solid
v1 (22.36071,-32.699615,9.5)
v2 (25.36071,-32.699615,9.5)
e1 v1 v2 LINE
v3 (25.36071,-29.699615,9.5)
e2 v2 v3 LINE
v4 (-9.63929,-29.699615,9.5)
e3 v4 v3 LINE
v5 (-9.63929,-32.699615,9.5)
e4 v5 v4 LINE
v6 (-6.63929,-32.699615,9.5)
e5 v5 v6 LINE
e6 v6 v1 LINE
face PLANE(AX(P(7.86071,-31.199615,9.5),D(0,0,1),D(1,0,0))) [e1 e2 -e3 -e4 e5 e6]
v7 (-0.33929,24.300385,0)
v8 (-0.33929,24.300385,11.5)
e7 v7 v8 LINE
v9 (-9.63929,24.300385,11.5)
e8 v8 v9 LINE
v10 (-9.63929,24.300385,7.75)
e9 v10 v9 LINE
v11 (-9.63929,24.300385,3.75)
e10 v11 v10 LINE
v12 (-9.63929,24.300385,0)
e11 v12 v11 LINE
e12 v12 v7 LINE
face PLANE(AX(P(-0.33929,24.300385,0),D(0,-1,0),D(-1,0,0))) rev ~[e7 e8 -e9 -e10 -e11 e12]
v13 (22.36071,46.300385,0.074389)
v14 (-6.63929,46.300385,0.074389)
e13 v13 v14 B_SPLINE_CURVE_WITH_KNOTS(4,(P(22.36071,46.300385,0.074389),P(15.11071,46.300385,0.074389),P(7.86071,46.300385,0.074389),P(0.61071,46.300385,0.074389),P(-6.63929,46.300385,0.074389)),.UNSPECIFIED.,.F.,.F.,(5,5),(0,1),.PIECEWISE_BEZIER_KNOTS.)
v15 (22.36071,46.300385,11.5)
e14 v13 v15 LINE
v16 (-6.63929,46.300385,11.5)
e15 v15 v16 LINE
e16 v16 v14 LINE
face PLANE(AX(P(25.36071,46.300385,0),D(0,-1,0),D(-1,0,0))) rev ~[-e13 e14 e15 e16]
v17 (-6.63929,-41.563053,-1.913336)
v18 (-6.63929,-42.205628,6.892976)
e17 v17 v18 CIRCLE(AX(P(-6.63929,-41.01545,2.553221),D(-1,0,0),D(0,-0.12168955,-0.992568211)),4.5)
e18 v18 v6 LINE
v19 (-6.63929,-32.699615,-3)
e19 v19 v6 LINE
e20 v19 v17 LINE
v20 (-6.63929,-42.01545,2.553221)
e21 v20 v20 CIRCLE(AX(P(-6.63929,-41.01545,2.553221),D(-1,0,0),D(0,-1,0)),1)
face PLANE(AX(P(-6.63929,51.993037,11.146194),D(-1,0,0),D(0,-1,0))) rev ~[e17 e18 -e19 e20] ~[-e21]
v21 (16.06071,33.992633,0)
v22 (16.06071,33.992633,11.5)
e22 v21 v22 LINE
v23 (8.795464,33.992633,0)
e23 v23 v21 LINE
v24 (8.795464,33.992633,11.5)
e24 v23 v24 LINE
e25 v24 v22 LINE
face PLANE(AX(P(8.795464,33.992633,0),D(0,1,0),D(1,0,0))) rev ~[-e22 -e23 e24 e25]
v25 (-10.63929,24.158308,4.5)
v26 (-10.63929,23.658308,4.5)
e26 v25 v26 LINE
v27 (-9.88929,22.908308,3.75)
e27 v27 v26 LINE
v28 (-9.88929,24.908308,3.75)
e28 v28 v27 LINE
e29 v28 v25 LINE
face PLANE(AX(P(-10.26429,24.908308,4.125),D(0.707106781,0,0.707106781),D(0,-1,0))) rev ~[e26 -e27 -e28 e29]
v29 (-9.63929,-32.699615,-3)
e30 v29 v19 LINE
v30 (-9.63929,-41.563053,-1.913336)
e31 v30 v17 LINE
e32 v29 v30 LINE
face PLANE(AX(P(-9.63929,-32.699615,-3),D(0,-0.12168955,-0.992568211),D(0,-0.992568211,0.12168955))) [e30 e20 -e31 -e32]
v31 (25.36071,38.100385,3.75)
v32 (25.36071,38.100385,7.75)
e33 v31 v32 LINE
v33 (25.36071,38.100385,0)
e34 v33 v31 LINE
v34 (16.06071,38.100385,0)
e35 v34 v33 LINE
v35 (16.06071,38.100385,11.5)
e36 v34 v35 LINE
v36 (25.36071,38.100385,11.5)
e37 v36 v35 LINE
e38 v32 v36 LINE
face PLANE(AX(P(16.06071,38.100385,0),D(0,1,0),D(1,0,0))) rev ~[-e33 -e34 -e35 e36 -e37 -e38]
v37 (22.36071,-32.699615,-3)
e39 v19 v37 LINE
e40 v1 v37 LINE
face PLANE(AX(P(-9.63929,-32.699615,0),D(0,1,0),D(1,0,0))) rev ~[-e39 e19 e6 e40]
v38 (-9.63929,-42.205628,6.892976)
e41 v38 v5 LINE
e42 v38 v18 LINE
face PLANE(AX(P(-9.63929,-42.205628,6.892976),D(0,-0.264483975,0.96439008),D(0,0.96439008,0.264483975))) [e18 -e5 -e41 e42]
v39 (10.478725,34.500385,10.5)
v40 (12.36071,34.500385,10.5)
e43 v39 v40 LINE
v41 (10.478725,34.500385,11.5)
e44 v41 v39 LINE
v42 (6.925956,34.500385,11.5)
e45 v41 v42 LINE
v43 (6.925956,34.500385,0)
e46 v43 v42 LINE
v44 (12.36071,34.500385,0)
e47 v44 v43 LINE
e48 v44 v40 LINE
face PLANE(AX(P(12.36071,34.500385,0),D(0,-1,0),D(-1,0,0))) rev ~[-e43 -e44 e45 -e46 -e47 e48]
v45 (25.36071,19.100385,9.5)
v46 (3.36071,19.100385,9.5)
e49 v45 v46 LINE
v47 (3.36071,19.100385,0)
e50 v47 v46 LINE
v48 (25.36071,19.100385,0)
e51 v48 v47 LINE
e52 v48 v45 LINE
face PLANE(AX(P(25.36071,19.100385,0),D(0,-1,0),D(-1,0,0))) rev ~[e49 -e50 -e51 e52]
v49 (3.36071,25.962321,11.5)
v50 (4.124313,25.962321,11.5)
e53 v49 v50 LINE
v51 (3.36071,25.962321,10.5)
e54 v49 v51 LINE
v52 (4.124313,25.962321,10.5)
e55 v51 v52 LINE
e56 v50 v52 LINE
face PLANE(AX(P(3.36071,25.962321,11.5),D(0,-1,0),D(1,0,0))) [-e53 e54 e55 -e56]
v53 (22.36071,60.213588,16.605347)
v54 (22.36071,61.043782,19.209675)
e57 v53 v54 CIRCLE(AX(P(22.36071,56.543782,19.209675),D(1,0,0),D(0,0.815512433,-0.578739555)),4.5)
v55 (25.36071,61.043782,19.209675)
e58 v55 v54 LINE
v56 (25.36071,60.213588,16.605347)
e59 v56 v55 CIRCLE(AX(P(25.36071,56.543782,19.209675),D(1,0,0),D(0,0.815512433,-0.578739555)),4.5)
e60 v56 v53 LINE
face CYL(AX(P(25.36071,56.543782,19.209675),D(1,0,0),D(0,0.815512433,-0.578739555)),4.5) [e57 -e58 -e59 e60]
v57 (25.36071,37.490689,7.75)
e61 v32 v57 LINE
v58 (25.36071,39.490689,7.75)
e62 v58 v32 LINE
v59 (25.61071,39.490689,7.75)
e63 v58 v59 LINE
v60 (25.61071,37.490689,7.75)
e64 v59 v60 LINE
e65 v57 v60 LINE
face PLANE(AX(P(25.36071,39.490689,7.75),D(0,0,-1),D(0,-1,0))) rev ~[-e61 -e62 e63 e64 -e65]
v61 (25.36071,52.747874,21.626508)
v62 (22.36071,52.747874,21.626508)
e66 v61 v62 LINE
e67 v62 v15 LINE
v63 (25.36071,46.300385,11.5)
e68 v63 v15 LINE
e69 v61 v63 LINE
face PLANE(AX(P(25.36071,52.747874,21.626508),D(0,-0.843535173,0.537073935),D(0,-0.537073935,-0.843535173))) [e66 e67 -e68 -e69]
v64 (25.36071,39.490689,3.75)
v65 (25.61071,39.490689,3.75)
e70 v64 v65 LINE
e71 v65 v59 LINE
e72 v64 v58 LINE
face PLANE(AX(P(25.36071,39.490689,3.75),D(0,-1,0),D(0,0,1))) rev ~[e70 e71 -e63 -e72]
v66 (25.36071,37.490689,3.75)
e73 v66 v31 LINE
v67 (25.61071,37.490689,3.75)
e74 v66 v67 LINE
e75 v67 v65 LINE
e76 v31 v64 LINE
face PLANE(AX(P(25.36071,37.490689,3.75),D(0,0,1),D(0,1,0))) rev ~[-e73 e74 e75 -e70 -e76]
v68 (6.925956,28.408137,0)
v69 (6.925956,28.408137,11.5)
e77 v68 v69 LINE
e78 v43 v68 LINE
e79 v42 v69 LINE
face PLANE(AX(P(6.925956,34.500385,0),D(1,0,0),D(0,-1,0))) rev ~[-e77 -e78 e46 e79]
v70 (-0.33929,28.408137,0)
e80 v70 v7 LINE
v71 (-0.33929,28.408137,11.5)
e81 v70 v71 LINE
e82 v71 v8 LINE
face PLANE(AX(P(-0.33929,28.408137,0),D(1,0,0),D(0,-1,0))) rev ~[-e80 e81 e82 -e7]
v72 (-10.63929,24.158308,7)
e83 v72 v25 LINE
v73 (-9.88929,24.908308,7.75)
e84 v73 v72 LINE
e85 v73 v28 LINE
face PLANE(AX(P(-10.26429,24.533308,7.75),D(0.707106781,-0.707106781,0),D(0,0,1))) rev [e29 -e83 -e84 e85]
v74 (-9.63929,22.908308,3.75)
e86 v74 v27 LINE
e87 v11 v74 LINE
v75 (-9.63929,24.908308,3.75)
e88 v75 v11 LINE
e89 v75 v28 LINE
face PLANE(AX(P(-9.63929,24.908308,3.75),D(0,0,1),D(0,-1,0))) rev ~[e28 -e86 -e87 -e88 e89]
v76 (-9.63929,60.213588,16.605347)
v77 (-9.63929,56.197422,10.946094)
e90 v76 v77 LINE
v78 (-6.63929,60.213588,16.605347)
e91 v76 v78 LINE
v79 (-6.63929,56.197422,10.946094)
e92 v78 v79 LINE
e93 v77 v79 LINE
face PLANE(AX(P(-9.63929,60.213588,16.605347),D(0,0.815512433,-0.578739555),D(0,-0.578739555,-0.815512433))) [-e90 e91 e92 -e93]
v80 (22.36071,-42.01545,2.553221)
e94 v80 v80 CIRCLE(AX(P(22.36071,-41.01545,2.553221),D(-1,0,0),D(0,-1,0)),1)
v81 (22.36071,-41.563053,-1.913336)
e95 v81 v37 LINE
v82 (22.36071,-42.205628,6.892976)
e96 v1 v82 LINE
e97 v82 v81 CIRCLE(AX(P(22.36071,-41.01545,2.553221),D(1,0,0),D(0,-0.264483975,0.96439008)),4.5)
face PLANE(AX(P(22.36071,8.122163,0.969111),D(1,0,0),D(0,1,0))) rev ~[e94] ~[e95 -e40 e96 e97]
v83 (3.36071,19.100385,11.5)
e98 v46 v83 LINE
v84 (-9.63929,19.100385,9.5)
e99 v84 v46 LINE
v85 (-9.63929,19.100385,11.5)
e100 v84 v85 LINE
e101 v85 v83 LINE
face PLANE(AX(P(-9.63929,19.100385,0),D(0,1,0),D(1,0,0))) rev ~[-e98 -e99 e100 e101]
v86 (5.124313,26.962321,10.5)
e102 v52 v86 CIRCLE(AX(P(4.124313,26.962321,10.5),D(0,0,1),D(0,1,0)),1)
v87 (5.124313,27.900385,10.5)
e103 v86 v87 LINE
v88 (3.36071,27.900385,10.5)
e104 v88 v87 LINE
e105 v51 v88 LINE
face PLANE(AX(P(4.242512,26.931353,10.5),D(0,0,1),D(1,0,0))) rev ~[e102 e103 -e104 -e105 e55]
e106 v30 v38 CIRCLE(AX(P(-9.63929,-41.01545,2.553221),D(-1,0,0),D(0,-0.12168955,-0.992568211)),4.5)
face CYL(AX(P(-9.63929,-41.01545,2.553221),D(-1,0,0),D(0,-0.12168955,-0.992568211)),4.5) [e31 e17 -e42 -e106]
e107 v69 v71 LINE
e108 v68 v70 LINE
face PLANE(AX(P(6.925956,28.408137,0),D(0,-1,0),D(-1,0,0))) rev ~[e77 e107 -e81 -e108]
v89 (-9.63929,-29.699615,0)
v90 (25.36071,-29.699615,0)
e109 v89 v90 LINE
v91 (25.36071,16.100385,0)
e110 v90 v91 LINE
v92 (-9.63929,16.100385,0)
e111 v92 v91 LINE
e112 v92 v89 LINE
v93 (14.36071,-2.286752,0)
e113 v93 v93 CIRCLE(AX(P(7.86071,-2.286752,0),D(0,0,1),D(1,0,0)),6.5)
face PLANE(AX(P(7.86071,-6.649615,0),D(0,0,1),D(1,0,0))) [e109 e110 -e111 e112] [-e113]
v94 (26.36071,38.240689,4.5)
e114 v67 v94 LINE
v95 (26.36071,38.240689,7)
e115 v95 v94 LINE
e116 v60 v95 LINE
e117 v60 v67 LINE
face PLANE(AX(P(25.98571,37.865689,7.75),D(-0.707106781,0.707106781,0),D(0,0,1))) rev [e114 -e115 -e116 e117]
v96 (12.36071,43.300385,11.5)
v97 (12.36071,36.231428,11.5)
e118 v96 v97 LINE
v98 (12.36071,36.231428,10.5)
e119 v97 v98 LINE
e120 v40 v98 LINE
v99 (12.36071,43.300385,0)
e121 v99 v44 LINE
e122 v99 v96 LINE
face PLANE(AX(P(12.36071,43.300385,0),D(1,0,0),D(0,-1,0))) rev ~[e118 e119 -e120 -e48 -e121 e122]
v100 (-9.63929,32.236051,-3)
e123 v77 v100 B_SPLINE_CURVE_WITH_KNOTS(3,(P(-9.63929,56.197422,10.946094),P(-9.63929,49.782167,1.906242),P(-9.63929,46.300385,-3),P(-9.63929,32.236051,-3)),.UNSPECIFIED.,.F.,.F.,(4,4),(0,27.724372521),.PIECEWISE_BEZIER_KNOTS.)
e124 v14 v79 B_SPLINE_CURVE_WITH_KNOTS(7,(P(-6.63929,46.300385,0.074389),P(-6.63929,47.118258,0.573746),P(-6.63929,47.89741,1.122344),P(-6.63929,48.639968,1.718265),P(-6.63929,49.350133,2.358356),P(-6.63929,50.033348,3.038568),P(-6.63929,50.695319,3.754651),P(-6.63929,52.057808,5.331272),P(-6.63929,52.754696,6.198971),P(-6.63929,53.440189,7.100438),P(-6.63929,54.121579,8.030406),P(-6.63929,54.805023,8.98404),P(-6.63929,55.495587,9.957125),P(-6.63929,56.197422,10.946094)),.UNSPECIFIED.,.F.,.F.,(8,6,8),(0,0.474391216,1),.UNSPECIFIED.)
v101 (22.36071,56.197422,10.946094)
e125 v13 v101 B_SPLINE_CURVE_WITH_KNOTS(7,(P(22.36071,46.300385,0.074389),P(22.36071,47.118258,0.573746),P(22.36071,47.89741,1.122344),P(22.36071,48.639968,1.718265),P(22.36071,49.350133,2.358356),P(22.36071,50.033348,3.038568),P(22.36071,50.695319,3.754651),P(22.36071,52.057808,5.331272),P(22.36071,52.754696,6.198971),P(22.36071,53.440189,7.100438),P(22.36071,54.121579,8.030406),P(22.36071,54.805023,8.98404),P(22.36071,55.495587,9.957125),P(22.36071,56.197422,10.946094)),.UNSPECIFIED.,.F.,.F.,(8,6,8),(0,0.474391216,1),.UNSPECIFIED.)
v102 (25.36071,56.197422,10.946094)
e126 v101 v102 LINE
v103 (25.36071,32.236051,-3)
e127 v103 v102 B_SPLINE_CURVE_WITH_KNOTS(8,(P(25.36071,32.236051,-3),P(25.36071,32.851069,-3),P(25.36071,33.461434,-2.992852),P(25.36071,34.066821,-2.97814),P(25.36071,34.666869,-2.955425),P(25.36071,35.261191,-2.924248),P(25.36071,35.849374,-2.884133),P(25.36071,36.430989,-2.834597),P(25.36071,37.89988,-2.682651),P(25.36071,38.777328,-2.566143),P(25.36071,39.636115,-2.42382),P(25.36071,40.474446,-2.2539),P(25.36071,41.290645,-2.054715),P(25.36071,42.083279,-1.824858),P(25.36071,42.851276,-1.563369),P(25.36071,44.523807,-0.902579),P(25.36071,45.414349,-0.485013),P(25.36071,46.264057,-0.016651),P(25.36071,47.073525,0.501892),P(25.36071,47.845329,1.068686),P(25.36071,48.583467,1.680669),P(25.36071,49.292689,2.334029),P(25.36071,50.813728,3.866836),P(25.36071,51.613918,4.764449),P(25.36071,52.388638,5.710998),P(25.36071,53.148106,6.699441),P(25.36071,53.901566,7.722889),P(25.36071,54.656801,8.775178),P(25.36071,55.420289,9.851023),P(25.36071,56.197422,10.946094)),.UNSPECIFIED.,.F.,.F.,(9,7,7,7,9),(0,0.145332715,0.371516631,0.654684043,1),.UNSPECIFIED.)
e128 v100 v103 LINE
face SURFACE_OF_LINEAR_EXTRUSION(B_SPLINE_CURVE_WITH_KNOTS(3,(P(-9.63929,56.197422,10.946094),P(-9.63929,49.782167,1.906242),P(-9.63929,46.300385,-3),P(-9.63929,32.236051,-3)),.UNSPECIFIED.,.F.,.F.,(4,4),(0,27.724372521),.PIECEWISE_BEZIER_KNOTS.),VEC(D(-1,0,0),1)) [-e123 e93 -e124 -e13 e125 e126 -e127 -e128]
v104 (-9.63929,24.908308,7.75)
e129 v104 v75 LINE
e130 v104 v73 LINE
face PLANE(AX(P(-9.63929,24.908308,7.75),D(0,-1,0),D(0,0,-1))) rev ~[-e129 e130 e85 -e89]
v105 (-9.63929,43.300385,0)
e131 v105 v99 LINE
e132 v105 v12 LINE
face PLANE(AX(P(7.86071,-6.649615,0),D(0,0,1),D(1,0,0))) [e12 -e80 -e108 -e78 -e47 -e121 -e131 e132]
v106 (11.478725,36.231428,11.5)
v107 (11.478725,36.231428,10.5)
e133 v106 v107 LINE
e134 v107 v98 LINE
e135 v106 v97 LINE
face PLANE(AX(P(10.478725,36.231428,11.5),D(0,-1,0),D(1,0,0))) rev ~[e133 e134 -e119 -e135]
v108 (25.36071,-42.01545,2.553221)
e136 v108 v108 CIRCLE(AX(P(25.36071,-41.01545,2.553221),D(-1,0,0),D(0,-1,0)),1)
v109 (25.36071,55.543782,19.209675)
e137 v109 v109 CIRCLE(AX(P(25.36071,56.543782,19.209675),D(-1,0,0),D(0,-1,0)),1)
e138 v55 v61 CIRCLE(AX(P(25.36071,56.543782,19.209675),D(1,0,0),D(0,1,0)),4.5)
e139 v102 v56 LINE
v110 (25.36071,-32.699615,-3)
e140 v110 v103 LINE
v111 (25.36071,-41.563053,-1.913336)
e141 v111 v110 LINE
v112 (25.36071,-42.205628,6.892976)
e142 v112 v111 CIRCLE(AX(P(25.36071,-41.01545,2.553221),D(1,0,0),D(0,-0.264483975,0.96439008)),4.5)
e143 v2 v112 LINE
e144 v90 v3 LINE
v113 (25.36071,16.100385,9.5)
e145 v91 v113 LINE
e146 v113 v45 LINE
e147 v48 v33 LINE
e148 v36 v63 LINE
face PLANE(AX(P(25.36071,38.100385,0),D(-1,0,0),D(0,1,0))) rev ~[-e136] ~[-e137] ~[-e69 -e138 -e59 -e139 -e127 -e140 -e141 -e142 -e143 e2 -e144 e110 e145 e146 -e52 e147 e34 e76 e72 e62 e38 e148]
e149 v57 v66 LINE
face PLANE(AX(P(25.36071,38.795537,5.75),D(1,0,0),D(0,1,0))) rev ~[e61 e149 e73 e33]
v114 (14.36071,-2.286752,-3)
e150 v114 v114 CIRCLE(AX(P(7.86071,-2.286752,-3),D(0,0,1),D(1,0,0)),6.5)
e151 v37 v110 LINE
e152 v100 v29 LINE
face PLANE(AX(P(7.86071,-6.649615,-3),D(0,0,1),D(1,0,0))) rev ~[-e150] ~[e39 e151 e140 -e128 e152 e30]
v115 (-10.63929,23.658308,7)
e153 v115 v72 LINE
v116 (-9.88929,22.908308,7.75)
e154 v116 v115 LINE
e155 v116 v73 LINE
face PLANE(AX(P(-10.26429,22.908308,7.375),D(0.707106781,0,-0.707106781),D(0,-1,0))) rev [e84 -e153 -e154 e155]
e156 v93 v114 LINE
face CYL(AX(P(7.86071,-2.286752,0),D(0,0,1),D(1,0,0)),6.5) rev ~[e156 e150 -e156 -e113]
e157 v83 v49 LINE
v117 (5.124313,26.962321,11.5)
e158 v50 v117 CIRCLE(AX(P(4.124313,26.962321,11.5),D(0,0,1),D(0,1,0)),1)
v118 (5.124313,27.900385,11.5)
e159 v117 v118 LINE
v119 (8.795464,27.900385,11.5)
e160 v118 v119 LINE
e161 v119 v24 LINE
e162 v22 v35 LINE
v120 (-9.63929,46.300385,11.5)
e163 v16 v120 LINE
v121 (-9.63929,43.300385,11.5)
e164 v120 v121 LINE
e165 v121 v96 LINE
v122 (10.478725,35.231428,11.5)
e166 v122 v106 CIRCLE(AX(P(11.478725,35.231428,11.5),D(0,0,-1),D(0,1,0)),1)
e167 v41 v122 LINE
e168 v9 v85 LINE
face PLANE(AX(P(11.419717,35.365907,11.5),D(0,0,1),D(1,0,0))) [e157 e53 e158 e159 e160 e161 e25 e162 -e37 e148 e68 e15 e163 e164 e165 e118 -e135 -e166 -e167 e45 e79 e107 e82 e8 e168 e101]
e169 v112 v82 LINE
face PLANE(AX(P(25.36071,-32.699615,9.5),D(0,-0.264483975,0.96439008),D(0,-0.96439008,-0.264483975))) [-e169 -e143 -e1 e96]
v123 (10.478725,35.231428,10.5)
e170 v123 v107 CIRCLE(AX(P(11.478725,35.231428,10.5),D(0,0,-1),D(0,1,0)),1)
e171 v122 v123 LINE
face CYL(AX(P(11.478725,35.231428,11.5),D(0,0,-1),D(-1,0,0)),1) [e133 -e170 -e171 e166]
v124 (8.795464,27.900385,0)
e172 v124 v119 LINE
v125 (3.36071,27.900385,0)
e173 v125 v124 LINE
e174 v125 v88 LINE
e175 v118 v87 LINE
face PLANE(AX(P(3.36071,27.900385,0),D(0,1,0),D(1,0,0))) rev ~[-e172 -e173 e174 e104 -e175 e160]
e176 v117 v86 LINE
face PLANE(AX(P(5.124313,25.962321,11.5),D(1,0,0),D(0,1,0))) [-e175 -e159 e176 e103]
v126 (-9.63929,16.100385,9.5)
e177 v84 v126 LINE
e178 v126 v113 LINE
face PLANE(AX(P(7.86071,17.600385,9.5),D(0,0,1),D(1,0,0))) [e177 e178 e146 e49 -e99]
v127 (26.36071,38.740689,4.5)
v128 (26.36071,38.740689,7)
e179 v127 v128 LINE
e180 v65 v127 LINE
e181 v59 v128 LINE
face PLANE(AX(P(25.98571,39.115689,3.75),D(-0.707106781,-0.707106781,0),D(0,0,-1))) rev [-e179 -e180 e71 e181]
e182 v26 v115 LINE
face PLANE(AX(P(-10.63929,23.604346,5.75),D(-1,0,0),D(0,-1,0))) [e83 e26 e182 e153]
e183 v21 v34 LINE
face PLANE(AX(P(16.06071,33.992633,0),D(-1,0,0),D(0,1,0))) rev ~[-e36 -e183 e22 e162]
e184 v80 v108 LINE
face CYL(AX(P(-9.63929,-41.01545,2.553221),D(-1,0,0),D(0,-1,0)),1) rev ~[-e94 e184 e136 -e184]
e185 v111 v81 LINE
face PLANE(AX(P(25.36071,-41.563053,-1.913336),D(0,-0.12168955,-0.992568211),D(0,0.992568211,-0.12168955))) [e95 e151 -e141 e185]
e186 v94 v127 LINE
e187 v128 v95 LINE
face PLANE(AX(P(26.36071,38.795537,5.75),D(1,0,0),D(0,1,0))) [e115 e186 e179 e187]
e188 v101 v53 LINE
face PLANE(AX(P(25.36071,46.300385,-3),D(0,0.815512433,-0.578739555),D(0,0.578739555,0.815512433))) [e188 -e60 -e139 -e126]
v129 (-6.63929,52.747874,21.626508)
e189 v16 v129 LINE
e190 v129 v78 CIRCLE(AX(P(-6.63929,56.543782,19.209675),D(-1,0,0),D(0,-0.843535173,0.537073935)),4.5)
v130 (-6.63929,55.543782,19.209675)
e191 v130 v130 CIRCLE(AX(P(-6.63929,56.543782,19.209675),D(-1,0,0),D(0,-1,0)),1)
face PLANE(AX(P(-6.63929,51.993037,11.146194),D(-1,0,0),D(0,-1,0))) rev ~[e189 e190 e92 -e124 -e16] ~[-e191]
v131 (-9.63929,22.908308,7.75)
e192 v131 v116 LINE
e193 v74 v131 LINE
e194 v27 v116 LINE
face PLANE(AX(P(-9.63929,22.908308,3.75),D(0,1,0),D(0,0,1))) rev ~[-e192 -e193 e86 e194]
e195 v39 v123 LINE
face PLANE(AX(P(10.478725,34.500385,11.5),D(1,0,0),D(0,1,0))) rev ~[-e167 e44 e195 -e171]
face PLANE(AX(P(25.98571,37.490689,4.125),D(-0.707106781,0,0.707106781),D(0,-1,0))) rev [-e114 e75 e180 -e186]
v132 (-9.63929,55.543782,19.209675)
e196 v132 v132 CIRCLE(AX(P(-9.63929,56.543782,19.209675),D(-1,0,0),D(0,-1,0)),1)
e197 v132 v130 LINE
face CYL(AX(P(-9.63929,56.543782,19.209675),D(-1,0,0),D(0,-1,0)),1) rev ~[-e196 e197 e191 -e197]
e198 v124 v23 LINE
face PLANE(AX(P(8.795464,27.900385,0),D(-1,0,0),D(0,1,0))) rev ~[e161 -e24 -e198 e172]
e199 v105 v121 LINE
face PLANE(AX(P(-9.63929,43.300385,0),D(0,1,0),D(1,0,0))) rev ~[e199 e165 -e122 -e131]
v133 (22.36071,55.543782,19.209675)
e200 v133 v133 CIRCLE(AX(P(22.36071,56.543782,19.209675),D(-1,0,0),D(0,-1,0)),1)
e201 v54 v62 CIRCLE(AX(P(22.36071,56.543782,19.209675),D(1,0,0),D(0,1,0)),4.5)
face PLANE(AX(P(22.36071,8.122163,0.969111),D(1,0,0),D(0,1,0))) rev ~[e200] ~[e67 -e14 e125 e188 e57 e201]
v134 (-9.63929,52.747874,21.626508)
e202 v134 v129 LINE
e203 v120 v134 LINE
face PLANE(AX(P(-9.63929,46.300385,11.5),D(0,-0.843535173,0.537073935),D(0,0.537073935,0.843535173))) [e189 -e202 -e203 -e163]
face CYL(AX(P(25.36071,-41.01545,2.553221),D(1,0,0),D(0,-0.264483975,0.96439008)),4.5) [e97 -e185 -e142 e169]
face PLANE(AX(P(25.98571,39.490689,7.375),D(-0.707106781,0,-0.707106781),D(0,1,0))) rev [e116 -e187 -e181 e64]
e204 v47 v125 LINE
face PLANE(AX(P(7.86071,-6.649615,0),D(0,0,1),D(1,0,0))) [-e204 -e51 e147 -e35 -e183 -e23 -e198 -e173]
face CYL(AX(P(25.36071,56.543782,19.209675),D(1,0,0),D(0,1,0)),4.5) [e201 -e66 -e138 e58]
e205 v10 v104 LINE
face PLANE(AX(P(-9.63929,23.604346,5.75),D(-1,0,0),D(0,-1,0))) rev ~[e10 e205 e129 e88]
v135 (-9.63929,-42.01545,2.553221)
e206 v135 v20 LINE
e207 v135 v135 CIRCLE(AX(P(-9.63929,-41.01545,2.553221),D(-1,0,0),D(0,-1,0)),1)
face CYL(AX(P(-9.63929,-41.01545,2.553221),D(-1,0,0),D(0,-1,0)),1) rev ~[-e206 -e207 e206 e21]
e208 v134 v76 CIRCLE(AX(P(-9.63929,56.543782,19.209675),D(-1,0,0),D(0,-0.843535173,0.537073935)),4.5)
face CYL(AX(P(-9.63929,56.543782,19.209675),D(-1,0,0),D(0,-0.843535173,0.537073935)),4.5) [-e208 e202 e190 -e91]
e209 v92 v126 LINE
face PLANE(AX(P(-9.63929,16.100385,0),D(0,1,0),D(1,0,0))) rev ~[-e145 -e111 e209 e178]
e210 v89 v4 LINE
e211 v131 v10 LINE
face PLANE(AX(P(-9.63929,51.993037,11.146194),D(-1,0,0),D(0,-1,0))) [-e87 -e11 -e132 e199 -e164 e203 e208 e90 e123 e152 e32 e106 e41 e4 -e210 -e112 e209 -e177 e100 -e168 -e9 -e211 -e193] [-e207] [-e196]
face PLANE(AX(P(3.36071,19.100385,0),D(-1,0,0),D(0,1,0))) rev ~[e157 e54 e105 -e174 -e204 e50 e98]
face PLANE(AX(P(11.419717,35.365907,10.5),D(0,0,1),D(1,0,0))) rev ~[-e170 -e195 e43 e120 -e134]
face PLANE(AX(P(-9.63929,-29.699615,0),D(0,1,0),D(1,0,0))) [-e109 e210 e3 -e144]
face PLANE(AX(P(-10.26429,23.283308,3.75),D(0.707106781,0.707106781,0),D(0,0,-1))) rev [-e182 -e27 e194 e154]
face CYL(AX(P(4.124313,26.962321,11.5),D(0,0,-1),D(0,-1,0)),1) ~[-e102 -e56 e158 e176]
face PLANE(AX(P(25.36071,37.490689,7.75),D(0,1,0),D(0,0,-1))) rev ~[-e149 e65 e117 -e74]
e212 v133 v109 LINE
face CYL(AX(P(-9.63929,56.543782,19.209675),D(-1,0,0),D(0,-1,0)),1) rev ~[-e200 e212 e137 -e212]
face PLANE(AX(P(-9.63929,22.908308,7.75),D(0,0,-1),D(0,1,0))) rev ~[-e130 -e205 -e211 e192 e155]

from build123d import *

# Parameters (mm, degrees)
F0_R      = 6.5
F0_W      = 34.999999702
F0_H      = 3
F0_H_2    = 0.3
F1_DEPTH  = 3
F2_DEPTH  = 9.5
F3_DEPTH  = 11.5
F5_DEPTH  = 3
F7_DEPTH  = 3
F8_R      = 1
F9_DEPTH  = 35.000999702
F11_DEPTH = 1
F13_DEPTH = 1
F14_SIZE  = 0.75
F15_W     = 1.8819853365
F15_H     = 1.731043148
F15_W_2   = 1.7636035271
F15_H_2   = 1.938064149
F16_DEPTH = 1
F18_DEPTH = 36.000999702
F19_R     = 1


# Not quite as in the source:
# - ends of sketch curves that miss each other by under 0.0002 mm in the source are joined
# - a feature names something its author has since deleted; it is built from what else it names


with BuildPart() as f1:
    # F0 (on Top) → F1 (new body)
    with BuildSketch(Plane.XY):
        Polygon((7.8607099131, 16.1003852367), (-9.6392899379, 16.1003852367), (-9.6392899379, -29.3996147633), (25.3607097641, -29.3996147633), (25.3607097641, 16.1003852367), align=None)
        with Locations((7.8607099131, -2.2867515218)):
            Circle(F0_R, mode=Mode.SUBTRACT)
        with Locations((7.8607099131, -31.1996147633)):
            Rectangle(F0_W, F0_H)
        Polygon((-9.6392899379, 19.1003852367), (-9.6392899379, 16.1003852367), (7.8607099131, 16.1003852367), (25.3607097641, 16.1003852367), (25.3607097641, 19.1003852367), (22.192974557, 19.1003852367), (3.3607097641, 19.1003852367), align=None)
        Polygon((-9.6392899379, 46.3003852367), (-9.6392899379, 43.3003852367), (-6.4715547308, 43.3003852367), (12.3607100621, 43.3003852367), (25.3607097641, 43.3003852367), (25.3607097641, 46.3003852367), align=None)
        with Locations((7.8607099131, -29.5496147633)):
            Rectangle(F0_W, F0_H_2)
        Polygon((16.0607097641, 38.1003852367), (25.3607097641, 38.1003852367), (25.3607097641, 43.3003852367), (12.3607100621, 43.3003852367), (12.3607100621, 35.3003852367), (12.3607100621, 34.5003852367), (7.8607097641, 34.5003852367), (7.8607100621, 33.9926332235), (8.7954637781, 33.9926332235), (16.0607097641, 33.9926332235), align=None)
        Polygon((-9.6392899379, 24.3003852367), (-9.6392899379, 19.1003852367), (3.3607097641, 19.1003852367), (3.3607097641, 27.1003852367), (3.3607097641, 27.9003852367), (7.8607100621, 27.9003852367), (7.8607100621, 28.4081372499), (6.9259563461, 28.4081372499), (-0.3392899379, 28.4081372499), (-0.3392899379, 24.3003852367), align=None)
        Polygon((6.9259563461, 34.5003852367), (6.9259563461, 28.4081372499), (7.8607097641, 28.4081372499), (7.8607100621, 33.9926332235), (7.8607100621, 34.5003852367), align=None)
        Polygon((7.8607100621, 28.4081372499), (7.8607100621, 27.9003852367), (8.7954637781, 27.9003852367), (8.7954637781, 33.9926332235), (7.8607097641, 33.9926332235), align=None)
        Polygon((-9.6392899379, 43.3003852367), (-9.6392899379, 24.3003852367), (-0.3392899379, 24.3003852367), (-0.3392899379, 28.4081372499), (6.9259563461, 28.4081372499), (6.9259563461, 34.5003852367), (7.8607100621, 34.5003852367), (12.3607100621, 34.5003852367), (12.3607100621, 35.3003852367), (12.3607100621, 43.3003852367), (-6.4715547308, 43.3003852367), align=None)
        Polygon((3.3607097641, 27.1003852367), (3.3607097641, 19.1003852367), (22.192974557, 19.1003852367), (25.3607097641, 19.1003852367), (25.3607097641, 38.1003852367), (16.0607097641, 38.1003852367), (16.0607097641, 33.9926332235), (8.7954637781, 33.9926332235), (8.7954637781, 27.9003852367), (7.8607100621, 27.9003852367), (3.3607097641, 27.9003852367), align=None)
    extrude(amount=-F1_DEPTH)

    # F0 (on Top) → F2 (join)
    with BuildSketch(Plane.XY):
        with Locations((7.8607099131, -31.1996147633)):
            Rectangle(F0_W, F0_H)
        Polygon((-9.6392899379, 19.1003852367), (-9.6392899379, 16.1003852367), (7.8607099131, 16.1003852367), (25.3607097641, 16.1003852367), (25.3607097641, 19.1003852367), (22.192974557, 19.1003852367), (3.3607097641, 19.1003852367), align=None)
    extrude(amount=F2_DEPTH)

    # F0 (on Top) → F3 (join)
    with BuildSketch(Plane.XY):
        Polygon((-9.6392899379, 46.3003852367), (-9.6392899379, 43.3003852367), (-6.4715547308, 43.3003852367), (12.3607100621, 43.3003852367), (25.3607097641, 43.3003852367), (25.3607097641, 46.3003852367), align=None)
        Polygon((-9.6392899379, 24.3003852367), (-9.6392899379, 19.1003852367), (3.3607097641, 19.1003852367), (3.3607097641, 27.1003852367), (3.3607097641, 27.9003852367), (7.8607100621, 27.9003852367), (7.8607100621, 28.4081372499), (6.9259563461, 28.4081372499), (-0.3392899379, 28.4081372499), (-0.3392899379, 24.3003852367), align=None)
        Polygon((7.8607100621, 28.4081372499), (7.8607100621, 27.9003852367), (8.7954637781, 27.9003852367), (8.7954637781, 33.9926332235), (7.8607097641, 33.9926332235), align=None)
        Polygon((6.9259563461, 34.5003852367), (6.9259563461, 28.4081372499), (7.8607097641, 28.4081372499), (7.8607100621, 33.9926332235), (7.8607100621, 34.5003852367), align=None)
        Polygon((16.0607097641, 38.1003852367), (25.3607097641, 38.1003852367), (25.3607097641, 43.3003852367), (12.3607100621, 43.3003852367), (12.3607100621, 35.3003852367), (12.3607100621, 34.5003852367), (7.8607097641, 34.5003852367), (7.8607100621, 33.9926332235), (8.7954637781, 33.9926332235), (16.0607097641, 33.9926332235), align=None)
    extrude(amount=F3_DEPTH)

    # F4 (on face) → F5 (join)
    with BuildSketch(Plane.YZ.offset(25.3607097641)):
        Polygon((-32.6996147633, -3), (46.3003852367, -3), (46.3003852367, 11.5), (38.1003852367, 11.5), (38.1003852367, 0), (19.1003852367, 0), (19.1003852367, 9.5), (16.1003852367, 9.5), (16.1003852367, 0), (-29.6996147633, 0), (-29.6996147633, 9.5), (-32.6996147633, 9.5), align=None)
        with BuildLine():
            Line((46.3003852367, 11.5), (46.3003852367, -3))
            Line((46.3003852367, -3), (60.2135883006, 16.6053474951))
            ThreePointArc((60.2135883006, 16.6053474951), (54.0324103863, 15.4756413664), (52.7478740756, 21.6265082006))
            Line((52.7478740756, 21.6265082006), (46.3003852367, 11.5))
        make_face()
        with BuildLine():
            ThreePointArc((52.7478740756, 21.6265082006), (54.0324103863, 15.4756413664), (60.2135883006, 16.6053474951))
            ThreePointArc((60.2135883006, 16.6053474951), (60.8312132136, 17.8429507129), (61.0437823534, 19.2096754909))
            ThreePointArc((61.0437823534, 19.2096754909), (57.8024349564, 23.5300682537), (52.7478740756, 21.6265082006))
        make_face()
        with BuildLine():
            Line((-41.5630528886, -1.9133363436), (-32.6996147633, -3))
            Line((-32.6996147633, -3), (-32.6996147633, 9.5))
            Line((-32.6996147633, 9.5), (-42.2056278, 6.8929759665))
            ThreePointArc((-42.2056278, 6.8929759665), (-38.2865124349, 6.1313346687), (-36.5154499114, 2.5532206055))
            ThreePointArc((-36.5154499114, 2.5532206055), (-38.0333544566, -0.8168100619), (-41.5630528886, -1.9133363436))
        make_face()
        with BuildLine():
            ThreePointArc((-42.2056278, 6.8929759665), (-45.503517949, 2.2257373389), (-41.5630528886, -1.9133363436))
            ThreePointArc((-41.5630528886, -1.9133363436), (-38.0333544566, -0.8168100619), (-36.5154499114, 2.5532206055))
            ThreePointArc((-36.5154499114, 2.5532206055), (-38.2865124349, 6.1313346687), (-42.2056278, 6.8929759665))
        make_face()
    extrude(amount=-F5_DEPTH)

    # F6 (on face) → F7 (join)
    with BuildSketch(Plane(origin=(-9.6392899379, 0, 0), x_dir=(0, -1, 0), z_dir=(-1, 0, 0))):
        with BuildLine():
            Line((-60.2135883006, 16.6053474951), (-46.3003852367, -3))
            Line((-46.3003852367, -3), (-46.3003852367, 11.5))
            Line((-46.3003852367, 11.5), (-52.7478740756, 21.6265082006))
            ThreePointArc((-52.7478740756, 21.6265082006), (-59.0551543205, 22.9437096154), (-60.2135883006, 16.6053474951))
        make_face()
        Polygon((-46.3003852367, 11.5), (-46.3003852367, -3), (32.6996147633, -3), (32.6996147633, 9.5), (29.6996147633, 9.5), (29.6996147633, 0), (-16.1003852367, 0), (-16.1003852367, 9.5), (-19.1003852367, 9.5), (-19.1003852367, 11.5), (-24.3003852367, 11.5), (-24.3003852367, 0), (-43.3003852367, 0), (-43.3003852367, 11.5), align=None)
        with BuildLine():
            Line((32.6996147633, 9.5), (32.6996147633, -3))
            Line((32.6996147633, -3), (41.5630528886, -1.9133363436))
            ThreePointArc((41.5630528886, -1.9133363436), (45.503517949, 2.2257373389), (42.2056278, 6.8929759665))
            Line((42.2056278, 6.8929759665), (32.6996147633, 9.5))
        make_face()
    extrude(amount=-F7_DEPTH)

    # F8 (on face) → F9 (cut, through all)
    with BuildSketch(Plane(origin=(-9.6392899379, 0, 0), x_dir=(0, -1, 0), z_dir=(-1, 0, 0))):
        with Locations((-56.5437823534, 19.2096754909)):
            Circle(F8_R)
        with Locations((41.0154499114, 2.5532206055)):
            Circle(F8_R)
    extrude(amount=-F9_DEPTH, mode=Mode.SUBTRACT)

    # F10 (on face) → F11 (join)
    with BuildSketch(Plane.YZ.offset(25.3607097641)):
        Polygon((39.4906885922, 7.75), (38.1003852367, 7.75), (38.1003852367, 3.75), (39.4906885922, 3.75), (39.4906885922, 5.75), align=None)
        Polygon((38.1003852367, 3.75), (38.1003852367, 7.75), (37.4906885922, 7.75), (37.4906885922, 5.75), (37.4906885922, 3.75), align=None)
    extrude(amount=F11_DEPTH)

    # F12 (on face) → F13 (join)
    with BuildSketch(Plane(origin=(-9.6392899379, 0, 0), x_dir=(0, -1, 0), z_dir=(-1, 0, 0))):
        Polygon((-22.9083076119, 7.75), (-24.3003852367, 7.75), (-24.3003852367, 3.75), (-22.9083076119, 3.75), (-22.9083076119, 5.75), align=None)
        Polygon((-24.9083076119, 7.75), (-24.9083076119, 5.75), (-24.9083076119, 3.75), (-24.3003852367, 3.75), (-24.3003852367, 7.75), align=None)
    extrude(amount=F13_DEPTH)

    # F14
    f14_edges = [f1.edges().sort_by_distance(p)[0] for p in [
        (-10.63929, 24.908308, 5.75),
        (-10.63929, 22.908308, 5.75),
        (-10.63929, 23.908308, 7.75),
        (-10.63929, 23.908308, 3.75),
        (26.36071, 38.490689, 7.75),
        (26.36071, 37.490689, 5.75),
        (26.36071, 38.490689, 3.75),
        (26.36071, 39.490689, 5.75),
    ]]
    chamfer(f14_edges, length=F14_SIZE)

    # F15 (on face) → F16 (join)
    with BuildSketch(Plane.XY.offset(11.5)):
        with Locations((11.4197173938, 35.3659068108)):
            Rectangle(F15_W, F15_H)
        with Locations((4.2425115276, 26.9313531622)):
            Rectangle(F15_W_2, F15_H_2)
    extrude(amount=-F16_DEPTH)

    # F17 (on face) → F18 (cut, through all)
    with BuildSketch(Plane(origin=(-9.6392899379, 0, 0), x_dir=(0, -1, 0), z_dir=(-1, 0, 0))):
        with BuildLine():
            Line((-56.1974216606, 10.9460940352), (-46.3003852367, -3))
            Line((-46.3003852367, -3), (-32.2360508144, -3))
            add(Edge.make_bspline(
                [(-56.1974216606, 10.9460940352), (-49.7821666885, 1.9062415714), (-46.3003852367, -3), (-32.2360508144, -3)],
                knots=[0, 0, 0, 0, 27.7243725207, 27.7243725207, 27.7243725207, 27.7243725207], degree=3))
        make_face()
    extrude(amount=-F18_DEPTH, mode=Mode.SUBTRACT)

    # F19
    f19_edges = [f1.edges().sort_by_distance(p)[0] for p in [
        (5.124313, 25.962321, 11),
        (10.478725, 36.231428, 11),
    ]]
    fillet(f19_edges, radius=F19_R)


solid = f1.part
